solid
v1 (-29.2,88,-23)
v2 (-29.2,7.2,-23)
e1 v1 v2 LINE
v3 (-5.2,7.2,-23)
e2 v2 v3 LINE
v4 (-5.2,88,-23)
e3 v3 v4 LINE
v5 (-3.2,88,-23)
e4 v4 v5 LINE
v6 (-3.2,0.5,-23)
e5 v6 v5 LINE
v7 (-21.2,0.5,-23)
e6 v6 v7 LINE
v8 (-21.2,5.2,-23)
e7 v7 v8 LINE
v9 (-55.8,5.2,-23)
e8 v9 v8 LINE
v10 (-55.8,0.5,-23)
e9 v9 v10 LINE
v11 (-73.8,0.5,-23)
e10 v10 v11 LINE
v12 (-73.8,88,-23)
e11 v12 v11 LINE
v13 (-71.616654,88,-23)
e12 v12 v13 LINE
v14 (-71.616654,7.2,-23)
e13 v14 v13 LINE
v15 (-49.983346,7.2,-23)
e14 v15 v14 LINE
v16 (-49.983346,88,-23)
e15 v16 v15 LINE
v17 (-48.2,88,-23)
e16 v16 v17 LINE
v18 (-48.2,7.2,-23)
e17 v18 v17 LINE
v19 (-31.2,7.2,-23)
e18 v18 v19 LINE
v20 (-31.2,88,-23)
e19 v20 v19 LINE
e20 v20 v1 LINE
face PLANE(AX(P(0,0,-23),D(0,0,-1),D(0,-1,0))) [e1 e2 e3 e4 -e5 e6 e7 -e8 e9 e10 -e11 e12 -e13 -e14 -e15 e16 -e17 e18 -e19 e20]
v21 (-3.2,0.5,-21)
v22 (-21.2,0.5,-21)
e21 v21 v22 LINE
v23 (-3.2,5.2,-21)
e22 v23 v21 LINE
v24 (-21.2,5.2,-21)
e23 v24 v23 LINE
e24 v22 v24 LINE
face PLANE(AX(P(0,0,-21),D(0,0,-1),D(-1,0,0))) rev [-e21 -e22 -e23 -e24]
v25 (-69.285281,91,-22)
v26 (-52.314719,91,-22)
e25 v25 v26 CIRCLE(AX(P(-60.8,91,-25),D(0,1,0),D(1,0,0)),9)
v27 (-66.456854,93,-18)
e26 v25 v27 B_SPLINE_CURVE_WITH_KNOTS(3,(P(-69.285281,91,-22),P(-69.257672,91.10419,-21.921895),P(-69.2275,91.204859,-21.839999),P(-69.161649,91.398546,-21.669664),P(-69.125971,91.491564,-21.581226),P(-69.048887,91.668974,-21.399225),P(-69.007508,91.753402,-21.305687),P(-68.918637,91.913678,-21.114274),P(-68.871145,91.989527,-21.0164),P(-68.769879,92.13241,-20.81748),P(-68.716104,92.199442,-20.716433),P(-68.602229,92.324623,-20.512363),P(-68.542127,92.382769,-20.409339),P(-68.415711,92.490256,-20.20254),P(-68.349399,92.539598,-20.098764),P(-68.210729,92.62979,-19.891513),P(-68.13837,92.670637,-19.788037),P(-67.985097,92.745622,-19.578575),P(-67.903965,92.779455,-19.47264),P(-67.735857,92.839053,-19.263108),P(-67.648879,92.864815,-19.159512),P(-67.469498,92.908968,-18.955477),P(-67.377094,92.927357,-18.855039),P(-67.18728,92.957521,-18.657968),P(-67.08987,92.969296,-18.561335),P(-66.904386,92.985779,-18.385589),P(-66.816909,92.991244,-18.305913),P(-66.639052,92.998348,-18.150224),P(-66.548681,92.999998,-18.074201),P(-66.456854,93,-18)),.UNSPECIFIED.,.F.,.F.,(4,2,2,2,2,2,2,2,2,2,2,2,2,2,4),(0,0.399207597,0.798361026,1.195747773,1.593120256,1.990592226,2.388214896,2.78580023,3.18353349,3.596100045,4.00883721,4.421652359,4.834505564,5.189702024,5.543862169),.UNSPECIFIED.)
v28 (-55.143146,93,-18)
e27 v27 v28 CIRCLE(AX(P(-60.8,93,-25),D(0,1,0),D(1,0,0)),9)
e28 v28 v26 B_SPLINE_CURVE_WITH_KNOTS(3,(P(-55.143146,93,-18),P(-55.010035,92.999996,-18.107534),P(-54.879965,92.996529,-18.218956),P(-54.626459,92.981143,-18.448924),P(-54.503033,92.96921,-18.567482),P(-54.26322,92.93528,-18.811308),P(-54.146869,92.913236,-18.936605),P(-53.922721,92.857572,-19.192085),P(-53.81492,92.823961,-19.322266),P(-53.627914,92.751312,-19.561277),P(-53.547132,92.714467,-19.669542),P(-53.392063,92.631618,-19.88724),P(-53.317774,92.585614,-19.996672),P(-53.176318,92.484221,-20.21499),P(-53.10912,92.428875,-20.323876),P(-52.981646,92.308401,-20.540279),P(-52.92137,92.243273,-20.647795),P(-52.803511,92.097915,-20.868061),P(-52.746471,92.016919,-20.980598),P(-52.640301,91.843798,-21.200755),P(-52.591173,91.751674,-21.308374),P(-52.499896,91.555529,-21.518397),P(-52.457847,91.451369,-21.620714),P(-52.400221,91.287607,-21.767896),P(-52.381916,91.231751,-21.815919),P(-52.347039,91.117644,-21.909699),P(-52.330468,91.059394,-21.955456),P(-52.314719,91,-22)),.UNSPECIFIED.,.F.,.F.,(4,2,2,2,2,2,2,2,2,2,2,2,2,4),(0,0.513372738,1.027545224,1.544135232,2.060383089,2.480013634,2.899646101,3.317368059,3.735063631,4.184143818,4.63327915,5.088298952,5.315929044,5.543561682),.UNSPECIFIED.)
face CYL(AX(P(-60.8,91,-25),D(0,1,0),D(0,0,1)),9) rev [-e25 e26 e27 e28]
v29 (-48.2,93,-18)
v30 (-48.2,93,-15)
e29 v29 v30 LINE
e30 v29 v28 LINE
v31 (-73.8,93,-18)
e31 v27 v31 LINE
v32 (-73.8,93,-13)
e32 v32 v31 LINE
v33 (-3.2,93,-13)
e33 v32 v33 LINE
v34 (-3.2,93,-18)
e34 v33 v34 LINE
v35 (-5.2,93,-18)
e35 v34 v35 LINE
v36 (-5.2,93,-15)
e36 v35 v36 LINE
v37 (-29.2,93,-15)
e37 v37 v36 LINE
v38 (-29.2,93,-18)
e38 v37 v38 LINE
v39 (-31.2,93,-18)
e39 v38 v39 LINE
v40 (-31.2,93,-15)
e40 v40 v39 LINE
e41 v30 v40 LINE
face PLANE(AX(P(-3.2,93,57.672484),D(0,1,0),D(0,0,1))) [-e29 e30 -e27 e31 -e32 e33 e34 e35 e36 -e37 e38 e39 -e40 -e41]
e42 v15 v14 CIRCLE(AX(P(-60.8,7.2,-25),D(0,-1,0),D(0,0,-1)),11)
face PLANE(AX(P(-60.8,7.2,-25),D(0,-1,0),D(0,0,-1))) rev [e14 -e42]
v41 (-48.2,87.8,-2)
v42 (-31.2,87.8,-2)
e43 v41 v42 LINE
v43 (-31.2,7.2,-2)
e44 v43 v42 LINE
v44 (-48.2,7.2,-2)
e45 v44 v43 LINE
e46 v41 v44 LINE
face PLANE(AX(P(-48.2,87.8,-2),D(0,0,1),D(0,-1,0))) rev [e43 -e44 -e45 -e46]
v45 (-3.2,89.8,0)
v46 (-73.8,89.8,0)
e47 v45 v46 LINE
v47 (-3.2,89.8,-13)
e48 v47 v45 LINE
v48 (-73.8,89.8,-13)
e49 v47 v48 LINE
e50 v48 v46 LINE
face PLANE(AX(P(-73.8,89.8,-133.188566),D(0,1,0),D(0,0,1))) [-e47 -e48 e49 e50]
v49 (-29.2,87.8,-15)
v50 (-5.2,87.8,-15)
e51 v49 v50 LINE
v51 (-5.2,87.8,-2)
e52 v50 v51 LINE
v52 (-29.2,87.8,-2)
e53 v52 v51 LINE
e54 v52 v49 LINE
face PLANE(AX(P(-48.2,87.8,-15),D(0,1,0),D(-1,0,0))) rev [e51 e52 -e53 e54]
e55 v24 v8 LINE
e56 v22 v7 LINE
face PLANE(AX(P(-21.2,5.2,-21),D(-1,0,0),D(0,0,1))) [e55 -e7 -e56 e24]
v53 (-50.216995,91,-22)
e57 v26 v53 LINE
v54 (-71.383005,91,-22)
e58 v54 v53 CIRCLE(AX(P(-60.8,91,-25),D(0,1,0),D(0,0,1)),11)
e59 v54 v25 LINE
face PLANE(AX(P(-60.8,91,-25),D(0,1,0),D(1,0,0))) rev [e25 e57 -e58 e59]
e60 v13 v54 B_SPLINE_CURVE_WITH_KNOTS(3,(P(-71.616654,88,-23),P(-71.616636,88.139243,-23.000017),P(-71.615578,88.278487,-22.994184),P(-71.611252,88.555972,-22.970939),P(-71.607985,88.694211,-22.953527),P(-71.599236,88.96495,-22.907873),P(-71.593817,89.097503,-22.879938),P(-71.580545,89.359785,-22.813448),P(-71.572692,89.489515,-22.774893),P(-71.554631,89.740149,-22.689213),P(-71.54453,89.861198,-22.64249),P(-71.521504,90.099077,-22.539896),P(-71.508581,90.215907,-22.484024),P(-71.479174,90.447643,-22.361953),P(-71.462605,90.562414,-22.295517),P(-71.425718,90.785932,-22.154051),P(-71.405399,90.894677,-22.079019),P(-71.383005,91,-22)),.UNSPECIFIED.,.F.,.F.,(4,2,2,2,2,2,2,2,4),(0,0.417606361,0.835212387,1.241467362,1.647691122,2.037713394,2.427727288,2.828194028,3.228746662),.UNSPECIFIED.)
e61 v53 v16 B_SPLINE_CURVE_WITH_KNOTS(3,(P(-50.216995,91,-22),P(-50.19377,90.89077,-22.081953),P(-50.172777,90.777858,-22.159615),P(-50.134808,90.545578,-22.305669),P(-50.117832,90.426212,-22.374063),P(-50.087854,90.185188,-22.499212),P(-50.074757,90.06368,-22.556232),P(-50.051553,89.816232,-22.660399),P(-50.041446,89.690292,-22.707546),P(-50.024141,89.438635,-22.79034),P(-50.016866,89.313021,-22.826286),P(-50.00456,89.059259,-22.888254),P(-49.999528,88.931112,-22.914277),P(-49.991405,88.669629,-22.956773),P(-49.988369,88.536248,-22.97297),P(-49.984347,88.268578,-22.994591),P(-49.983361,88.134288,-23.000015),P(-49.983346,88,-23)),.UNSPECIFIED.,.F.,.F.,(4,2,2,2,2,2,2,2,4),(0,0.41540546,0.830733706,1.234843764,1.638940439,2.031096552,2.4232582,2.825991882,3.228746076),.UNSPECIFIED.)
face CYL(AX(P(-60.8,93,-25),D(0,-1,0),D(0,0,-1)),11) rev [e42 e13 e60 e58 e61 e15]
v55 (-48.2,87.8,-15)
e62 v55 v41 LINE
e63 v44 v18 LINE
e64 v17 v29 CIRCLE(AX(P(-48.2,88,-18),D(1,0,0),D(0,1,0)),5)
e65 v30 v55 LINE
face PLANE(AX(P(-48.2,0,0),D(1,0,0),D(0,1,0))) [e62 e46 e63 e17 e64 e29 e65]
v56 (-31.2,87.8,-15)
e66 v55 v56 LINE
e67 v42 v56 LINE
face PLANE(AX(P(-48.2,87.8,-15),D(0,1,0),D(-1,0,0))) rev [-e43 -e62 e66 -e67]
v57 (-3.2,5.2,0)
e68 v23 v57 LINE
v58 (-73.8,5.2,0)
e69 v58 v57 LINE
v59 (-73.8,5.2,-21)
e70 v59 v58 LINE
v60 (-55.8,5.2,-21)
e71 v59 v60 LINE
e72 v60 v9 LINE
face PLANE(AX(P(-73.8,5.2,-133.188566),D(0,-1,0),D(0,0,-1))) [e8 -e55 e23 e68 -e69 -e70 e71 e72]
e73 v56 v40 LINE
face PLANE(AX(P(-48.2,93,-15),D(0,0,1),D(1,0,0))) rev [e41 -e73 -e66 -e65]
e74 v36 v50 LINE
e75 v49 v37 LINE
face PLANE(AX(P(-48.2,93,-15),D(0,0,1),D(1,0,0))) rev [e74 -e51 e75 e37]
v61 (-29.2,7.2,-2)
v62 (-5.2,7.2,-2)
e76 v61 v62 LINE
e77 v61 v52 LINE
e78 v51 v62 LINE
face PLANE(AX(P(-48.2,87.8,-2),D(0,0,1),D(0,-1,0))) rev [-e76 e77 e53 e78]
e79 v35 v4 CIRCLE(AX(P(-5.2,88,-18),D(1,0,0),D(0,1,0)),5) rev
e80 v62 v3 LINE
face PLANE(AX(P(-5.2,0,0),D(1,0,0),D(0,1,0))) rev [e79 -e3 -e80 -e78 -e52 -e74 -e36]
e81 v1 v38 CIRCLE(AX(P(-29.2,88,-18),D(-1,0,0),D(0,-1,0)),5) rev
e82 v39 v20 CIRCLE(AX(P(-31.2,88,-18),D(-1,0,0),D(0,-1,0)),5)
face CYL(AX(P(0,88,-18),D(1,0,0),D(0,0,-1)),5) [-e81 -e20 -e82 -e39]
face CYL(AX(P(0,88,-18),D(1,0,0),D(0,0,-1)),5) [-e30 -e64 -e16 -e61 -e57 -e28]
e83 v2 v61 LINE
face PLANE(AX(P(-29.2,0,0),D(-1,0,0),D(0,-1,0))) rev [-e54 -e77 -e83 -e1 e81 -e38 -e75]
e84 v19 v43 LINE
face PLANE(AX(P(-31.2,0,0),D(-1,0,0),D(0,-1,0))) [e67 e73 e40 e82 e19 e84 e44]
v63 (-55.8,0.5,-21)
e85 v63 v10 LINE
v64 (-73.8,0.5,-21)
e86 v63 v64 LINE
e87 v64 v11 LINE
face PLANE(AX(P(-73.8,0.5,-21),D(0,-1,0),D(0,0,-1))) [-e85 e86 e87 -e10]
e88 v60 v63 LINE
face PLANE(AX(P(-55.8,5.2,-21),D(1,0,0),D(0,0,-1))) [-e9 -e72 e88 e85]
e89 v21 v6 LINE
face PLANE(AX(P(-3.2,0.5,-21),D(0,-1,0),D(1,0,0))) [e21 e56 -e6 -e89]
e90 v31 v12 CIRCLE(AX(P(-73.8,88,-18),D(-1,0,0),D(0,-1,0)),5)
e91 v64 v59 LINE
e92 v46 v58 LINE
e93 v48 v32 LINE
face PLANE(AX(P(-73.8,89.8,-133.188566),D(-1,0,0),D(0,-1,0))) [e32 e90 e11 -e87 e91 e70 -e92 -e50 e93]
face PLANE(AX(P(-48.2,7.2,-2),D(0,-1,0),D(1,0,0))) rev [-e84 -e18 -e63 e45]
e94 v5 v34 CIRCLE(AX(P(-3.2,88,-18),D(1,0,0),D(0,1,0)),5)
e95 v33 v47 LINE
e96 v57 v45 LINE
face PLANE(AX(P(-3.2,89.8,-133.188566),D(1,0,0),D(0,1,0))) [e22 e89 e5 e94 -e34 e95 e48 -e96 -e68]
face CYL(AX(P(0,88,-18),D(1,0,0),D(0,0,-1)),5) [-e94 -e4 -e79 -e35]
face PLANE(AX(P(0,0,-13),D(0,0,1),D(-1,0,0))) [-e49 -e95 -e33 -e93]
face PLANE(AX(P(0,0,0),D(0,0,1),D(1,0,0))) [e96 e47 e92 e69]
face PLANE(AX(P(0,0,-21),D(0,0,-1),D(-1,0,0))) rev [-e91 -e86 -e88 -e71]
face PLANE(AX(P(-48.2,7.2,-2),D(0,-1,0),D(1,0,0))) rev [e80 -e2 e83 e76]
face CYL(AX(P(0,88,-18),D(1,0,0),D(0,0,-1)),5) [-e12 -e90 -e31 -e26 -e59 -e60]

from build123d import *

# Parameters (mm, degrees)
SKETCH_1_W          = 70.6
SKETCH_1_H          = 84.6
EXTRUDE_1_DEPTH     = 23
SKETCH_2_W          = 18
SKETCH_2_H          = 4.7
EXTRUDE_2_DEPTH     = 2
SKETCH_3_W          = 70.6
SKETCH_3_H          = 3.2
EXTRUDE_5_DEPTH     = 10
CUT_EXTRUDE_START   = -2
SKETCH_4_R          = 11
CUT_EXTRUDE_1_DEPTH = 115.979827321
EXTRUDE_START       = -2
EXTRUDE_1_2_DEPTH   = 2
DELETE_START        = 91
DELETE_FACE_1_DEPTH = 2
CUT_EXTRUDE_2_DEPTH = 43
EXTRUDE_START_2     = 24
EXTRUDE_6_DEPTH     = 2
FILLET_1_R          = 5


# Read off the part's stored shape, not the designer's step: 删除面1
with BuildPart() as part:
    # 草图1 → Extrude 1 (new body)
    with BuildSketch(Plane.XY):
        with Locations((-38.5, 47.5)):
            Rectangle(SKETCH_1_W, SKETCH_1_H)
    extrude(amount=-EXTRUDE_1_DEPTH)

    # 草图2 → 凸台-拉伸2 (add)
    with BuildSketch(Plane(origin=(0, 0, -23), x_dir=(-1, 0, 0), z_dir=(0, 0, -1))):
        with Locations((12.2, 2.85)):
            Rectangle(SKETCH_2_W, SKETCH_2_H)
        with Locations((64.8, 2.85)):
            Rectangle(SKETCH_2_W, SKETCH_2_H)
    extrude(amount=-EXTRUDE_2_DEPTH)

    # 草图3 → 凸台-拉伸5 (add)
    with BuildSketch(Plane(origin=(0, 0, -23), x_dir=(-1, 0, 0), z_dir=(0, 0, -1))):
        with Locations((38.5, 91.4)):
            Rectangle(SKETCH_3_W, SKETCH_3_H)
    extrude(amount=-EXTRUDE_5_DEPTH)

    # 草图4 → 切除-拉伸1 (cut, through all)
    with BuildSketch(Plane.XZ.offset(-5.2).offset(CUT_EXTRUDE_START)):
        with Locations((-60.8, -25)):
            Circle(SKETCH_4_R)
    extrude(amount=-CUT_EXTRUDE_1_DEPTH, mode=Mode.SUBTRACT)

    # 草图5 → Extrude 1 2 (add)
    with BuildSketch(Plane(origin=(0, 93, 0), x_dir=(1, 0, 0), z_dir=(0, 1, 0)).offset(EXTRUDE_START)):
        with BuildLine():
            ThreePointArc((-71.616653826, 23), (-60.8, 14), (-49.983346174, 23))
            Line((-49.983346174, 23), (-51.950010506, 23.363636364))
            ThreePointArc((-51.950010506, 23.363636364), (-60.8, 16), (-69.649989494, 23.363636364))
            Line((-69.649989494, 23.363636364), (-71.616653826, 23))
        make_face()
    extrude(amount=EXTRUDE_1_2_DEPTH)

    # Delete Face 1 outline → Delete Face 1 (cut)
    with BuildSketch(Plane(origin=(0, 0, 0), x_dir=(1, 0, 0), z_dir=(0, 1, 0)).offset(DELETE_START)):
        with BuildLine():
            ThreePointArc((-51.950010506, 23.363636364), (-51.985647631, 23.181431245), (-52.025035613, 23))
            Line((-52.025035613, 23), (-49.983346174, 23))
            Line((-49.983346174, 23), (-51.950010506, 23.363636364))
        make_face()
        with BuildLine():
            Line((-69.649989494, 23.363636364), (-71.616653826, 23))
            Line((-71.616653826, 23), (-69.574964387, 23))
            ThreePointArc((-69.574964387, 23), (-69.614352369, 23.181431245), (-69.649989494, 23.363636364))
        make_face()
    extrude(amount=DELETE_FACE_1_DEPTH, mode=Mode.SUBTRACT)

    # 草图6 → 切除-拉伸2 (cut)
    with BuildSketch(Plane(origin=(-3.2, 0, 0), x_dir=(0, 0, -1), z_dir=(1, 0, 0)).offset(CUT_EXTRUDE_START)):
        Polygon((23, 93), (15, 93), (15, 87.8), (2, 87.8), (2, 7.2), (23, 7.2), align=None)
    extrude(amount=-CUT_EXTRUDE_2_DEPTH, mode=Mode.SUBTRACT)

    # 草图7 → 凸台-拉伸6 (add)
    with BuildSketch(Plane.ZY.offset(5.2).offset(EXTRUDE_START_2)):
        Polygon((-23, 93), (-23, 7.2), (-2, 7.2), (-2, 87.8), (-15, 87.8), (-15, 93), align=None)
    extrude(amount=EXTRUDE_6_DEPTH)

    # 圆角1
    fillet_1_edges = [part.edges().sort_by_distance(p)[0] for p in [
        (-71.687482193, 93, -23),
        (-50.112517807, 93, -23),
        (-30.2, 93, -23),
        (-4.2, 93, -23),
    ]]
    fillet(fillet_1_edges, radius=FILLET_1_R)


solid = part.part
